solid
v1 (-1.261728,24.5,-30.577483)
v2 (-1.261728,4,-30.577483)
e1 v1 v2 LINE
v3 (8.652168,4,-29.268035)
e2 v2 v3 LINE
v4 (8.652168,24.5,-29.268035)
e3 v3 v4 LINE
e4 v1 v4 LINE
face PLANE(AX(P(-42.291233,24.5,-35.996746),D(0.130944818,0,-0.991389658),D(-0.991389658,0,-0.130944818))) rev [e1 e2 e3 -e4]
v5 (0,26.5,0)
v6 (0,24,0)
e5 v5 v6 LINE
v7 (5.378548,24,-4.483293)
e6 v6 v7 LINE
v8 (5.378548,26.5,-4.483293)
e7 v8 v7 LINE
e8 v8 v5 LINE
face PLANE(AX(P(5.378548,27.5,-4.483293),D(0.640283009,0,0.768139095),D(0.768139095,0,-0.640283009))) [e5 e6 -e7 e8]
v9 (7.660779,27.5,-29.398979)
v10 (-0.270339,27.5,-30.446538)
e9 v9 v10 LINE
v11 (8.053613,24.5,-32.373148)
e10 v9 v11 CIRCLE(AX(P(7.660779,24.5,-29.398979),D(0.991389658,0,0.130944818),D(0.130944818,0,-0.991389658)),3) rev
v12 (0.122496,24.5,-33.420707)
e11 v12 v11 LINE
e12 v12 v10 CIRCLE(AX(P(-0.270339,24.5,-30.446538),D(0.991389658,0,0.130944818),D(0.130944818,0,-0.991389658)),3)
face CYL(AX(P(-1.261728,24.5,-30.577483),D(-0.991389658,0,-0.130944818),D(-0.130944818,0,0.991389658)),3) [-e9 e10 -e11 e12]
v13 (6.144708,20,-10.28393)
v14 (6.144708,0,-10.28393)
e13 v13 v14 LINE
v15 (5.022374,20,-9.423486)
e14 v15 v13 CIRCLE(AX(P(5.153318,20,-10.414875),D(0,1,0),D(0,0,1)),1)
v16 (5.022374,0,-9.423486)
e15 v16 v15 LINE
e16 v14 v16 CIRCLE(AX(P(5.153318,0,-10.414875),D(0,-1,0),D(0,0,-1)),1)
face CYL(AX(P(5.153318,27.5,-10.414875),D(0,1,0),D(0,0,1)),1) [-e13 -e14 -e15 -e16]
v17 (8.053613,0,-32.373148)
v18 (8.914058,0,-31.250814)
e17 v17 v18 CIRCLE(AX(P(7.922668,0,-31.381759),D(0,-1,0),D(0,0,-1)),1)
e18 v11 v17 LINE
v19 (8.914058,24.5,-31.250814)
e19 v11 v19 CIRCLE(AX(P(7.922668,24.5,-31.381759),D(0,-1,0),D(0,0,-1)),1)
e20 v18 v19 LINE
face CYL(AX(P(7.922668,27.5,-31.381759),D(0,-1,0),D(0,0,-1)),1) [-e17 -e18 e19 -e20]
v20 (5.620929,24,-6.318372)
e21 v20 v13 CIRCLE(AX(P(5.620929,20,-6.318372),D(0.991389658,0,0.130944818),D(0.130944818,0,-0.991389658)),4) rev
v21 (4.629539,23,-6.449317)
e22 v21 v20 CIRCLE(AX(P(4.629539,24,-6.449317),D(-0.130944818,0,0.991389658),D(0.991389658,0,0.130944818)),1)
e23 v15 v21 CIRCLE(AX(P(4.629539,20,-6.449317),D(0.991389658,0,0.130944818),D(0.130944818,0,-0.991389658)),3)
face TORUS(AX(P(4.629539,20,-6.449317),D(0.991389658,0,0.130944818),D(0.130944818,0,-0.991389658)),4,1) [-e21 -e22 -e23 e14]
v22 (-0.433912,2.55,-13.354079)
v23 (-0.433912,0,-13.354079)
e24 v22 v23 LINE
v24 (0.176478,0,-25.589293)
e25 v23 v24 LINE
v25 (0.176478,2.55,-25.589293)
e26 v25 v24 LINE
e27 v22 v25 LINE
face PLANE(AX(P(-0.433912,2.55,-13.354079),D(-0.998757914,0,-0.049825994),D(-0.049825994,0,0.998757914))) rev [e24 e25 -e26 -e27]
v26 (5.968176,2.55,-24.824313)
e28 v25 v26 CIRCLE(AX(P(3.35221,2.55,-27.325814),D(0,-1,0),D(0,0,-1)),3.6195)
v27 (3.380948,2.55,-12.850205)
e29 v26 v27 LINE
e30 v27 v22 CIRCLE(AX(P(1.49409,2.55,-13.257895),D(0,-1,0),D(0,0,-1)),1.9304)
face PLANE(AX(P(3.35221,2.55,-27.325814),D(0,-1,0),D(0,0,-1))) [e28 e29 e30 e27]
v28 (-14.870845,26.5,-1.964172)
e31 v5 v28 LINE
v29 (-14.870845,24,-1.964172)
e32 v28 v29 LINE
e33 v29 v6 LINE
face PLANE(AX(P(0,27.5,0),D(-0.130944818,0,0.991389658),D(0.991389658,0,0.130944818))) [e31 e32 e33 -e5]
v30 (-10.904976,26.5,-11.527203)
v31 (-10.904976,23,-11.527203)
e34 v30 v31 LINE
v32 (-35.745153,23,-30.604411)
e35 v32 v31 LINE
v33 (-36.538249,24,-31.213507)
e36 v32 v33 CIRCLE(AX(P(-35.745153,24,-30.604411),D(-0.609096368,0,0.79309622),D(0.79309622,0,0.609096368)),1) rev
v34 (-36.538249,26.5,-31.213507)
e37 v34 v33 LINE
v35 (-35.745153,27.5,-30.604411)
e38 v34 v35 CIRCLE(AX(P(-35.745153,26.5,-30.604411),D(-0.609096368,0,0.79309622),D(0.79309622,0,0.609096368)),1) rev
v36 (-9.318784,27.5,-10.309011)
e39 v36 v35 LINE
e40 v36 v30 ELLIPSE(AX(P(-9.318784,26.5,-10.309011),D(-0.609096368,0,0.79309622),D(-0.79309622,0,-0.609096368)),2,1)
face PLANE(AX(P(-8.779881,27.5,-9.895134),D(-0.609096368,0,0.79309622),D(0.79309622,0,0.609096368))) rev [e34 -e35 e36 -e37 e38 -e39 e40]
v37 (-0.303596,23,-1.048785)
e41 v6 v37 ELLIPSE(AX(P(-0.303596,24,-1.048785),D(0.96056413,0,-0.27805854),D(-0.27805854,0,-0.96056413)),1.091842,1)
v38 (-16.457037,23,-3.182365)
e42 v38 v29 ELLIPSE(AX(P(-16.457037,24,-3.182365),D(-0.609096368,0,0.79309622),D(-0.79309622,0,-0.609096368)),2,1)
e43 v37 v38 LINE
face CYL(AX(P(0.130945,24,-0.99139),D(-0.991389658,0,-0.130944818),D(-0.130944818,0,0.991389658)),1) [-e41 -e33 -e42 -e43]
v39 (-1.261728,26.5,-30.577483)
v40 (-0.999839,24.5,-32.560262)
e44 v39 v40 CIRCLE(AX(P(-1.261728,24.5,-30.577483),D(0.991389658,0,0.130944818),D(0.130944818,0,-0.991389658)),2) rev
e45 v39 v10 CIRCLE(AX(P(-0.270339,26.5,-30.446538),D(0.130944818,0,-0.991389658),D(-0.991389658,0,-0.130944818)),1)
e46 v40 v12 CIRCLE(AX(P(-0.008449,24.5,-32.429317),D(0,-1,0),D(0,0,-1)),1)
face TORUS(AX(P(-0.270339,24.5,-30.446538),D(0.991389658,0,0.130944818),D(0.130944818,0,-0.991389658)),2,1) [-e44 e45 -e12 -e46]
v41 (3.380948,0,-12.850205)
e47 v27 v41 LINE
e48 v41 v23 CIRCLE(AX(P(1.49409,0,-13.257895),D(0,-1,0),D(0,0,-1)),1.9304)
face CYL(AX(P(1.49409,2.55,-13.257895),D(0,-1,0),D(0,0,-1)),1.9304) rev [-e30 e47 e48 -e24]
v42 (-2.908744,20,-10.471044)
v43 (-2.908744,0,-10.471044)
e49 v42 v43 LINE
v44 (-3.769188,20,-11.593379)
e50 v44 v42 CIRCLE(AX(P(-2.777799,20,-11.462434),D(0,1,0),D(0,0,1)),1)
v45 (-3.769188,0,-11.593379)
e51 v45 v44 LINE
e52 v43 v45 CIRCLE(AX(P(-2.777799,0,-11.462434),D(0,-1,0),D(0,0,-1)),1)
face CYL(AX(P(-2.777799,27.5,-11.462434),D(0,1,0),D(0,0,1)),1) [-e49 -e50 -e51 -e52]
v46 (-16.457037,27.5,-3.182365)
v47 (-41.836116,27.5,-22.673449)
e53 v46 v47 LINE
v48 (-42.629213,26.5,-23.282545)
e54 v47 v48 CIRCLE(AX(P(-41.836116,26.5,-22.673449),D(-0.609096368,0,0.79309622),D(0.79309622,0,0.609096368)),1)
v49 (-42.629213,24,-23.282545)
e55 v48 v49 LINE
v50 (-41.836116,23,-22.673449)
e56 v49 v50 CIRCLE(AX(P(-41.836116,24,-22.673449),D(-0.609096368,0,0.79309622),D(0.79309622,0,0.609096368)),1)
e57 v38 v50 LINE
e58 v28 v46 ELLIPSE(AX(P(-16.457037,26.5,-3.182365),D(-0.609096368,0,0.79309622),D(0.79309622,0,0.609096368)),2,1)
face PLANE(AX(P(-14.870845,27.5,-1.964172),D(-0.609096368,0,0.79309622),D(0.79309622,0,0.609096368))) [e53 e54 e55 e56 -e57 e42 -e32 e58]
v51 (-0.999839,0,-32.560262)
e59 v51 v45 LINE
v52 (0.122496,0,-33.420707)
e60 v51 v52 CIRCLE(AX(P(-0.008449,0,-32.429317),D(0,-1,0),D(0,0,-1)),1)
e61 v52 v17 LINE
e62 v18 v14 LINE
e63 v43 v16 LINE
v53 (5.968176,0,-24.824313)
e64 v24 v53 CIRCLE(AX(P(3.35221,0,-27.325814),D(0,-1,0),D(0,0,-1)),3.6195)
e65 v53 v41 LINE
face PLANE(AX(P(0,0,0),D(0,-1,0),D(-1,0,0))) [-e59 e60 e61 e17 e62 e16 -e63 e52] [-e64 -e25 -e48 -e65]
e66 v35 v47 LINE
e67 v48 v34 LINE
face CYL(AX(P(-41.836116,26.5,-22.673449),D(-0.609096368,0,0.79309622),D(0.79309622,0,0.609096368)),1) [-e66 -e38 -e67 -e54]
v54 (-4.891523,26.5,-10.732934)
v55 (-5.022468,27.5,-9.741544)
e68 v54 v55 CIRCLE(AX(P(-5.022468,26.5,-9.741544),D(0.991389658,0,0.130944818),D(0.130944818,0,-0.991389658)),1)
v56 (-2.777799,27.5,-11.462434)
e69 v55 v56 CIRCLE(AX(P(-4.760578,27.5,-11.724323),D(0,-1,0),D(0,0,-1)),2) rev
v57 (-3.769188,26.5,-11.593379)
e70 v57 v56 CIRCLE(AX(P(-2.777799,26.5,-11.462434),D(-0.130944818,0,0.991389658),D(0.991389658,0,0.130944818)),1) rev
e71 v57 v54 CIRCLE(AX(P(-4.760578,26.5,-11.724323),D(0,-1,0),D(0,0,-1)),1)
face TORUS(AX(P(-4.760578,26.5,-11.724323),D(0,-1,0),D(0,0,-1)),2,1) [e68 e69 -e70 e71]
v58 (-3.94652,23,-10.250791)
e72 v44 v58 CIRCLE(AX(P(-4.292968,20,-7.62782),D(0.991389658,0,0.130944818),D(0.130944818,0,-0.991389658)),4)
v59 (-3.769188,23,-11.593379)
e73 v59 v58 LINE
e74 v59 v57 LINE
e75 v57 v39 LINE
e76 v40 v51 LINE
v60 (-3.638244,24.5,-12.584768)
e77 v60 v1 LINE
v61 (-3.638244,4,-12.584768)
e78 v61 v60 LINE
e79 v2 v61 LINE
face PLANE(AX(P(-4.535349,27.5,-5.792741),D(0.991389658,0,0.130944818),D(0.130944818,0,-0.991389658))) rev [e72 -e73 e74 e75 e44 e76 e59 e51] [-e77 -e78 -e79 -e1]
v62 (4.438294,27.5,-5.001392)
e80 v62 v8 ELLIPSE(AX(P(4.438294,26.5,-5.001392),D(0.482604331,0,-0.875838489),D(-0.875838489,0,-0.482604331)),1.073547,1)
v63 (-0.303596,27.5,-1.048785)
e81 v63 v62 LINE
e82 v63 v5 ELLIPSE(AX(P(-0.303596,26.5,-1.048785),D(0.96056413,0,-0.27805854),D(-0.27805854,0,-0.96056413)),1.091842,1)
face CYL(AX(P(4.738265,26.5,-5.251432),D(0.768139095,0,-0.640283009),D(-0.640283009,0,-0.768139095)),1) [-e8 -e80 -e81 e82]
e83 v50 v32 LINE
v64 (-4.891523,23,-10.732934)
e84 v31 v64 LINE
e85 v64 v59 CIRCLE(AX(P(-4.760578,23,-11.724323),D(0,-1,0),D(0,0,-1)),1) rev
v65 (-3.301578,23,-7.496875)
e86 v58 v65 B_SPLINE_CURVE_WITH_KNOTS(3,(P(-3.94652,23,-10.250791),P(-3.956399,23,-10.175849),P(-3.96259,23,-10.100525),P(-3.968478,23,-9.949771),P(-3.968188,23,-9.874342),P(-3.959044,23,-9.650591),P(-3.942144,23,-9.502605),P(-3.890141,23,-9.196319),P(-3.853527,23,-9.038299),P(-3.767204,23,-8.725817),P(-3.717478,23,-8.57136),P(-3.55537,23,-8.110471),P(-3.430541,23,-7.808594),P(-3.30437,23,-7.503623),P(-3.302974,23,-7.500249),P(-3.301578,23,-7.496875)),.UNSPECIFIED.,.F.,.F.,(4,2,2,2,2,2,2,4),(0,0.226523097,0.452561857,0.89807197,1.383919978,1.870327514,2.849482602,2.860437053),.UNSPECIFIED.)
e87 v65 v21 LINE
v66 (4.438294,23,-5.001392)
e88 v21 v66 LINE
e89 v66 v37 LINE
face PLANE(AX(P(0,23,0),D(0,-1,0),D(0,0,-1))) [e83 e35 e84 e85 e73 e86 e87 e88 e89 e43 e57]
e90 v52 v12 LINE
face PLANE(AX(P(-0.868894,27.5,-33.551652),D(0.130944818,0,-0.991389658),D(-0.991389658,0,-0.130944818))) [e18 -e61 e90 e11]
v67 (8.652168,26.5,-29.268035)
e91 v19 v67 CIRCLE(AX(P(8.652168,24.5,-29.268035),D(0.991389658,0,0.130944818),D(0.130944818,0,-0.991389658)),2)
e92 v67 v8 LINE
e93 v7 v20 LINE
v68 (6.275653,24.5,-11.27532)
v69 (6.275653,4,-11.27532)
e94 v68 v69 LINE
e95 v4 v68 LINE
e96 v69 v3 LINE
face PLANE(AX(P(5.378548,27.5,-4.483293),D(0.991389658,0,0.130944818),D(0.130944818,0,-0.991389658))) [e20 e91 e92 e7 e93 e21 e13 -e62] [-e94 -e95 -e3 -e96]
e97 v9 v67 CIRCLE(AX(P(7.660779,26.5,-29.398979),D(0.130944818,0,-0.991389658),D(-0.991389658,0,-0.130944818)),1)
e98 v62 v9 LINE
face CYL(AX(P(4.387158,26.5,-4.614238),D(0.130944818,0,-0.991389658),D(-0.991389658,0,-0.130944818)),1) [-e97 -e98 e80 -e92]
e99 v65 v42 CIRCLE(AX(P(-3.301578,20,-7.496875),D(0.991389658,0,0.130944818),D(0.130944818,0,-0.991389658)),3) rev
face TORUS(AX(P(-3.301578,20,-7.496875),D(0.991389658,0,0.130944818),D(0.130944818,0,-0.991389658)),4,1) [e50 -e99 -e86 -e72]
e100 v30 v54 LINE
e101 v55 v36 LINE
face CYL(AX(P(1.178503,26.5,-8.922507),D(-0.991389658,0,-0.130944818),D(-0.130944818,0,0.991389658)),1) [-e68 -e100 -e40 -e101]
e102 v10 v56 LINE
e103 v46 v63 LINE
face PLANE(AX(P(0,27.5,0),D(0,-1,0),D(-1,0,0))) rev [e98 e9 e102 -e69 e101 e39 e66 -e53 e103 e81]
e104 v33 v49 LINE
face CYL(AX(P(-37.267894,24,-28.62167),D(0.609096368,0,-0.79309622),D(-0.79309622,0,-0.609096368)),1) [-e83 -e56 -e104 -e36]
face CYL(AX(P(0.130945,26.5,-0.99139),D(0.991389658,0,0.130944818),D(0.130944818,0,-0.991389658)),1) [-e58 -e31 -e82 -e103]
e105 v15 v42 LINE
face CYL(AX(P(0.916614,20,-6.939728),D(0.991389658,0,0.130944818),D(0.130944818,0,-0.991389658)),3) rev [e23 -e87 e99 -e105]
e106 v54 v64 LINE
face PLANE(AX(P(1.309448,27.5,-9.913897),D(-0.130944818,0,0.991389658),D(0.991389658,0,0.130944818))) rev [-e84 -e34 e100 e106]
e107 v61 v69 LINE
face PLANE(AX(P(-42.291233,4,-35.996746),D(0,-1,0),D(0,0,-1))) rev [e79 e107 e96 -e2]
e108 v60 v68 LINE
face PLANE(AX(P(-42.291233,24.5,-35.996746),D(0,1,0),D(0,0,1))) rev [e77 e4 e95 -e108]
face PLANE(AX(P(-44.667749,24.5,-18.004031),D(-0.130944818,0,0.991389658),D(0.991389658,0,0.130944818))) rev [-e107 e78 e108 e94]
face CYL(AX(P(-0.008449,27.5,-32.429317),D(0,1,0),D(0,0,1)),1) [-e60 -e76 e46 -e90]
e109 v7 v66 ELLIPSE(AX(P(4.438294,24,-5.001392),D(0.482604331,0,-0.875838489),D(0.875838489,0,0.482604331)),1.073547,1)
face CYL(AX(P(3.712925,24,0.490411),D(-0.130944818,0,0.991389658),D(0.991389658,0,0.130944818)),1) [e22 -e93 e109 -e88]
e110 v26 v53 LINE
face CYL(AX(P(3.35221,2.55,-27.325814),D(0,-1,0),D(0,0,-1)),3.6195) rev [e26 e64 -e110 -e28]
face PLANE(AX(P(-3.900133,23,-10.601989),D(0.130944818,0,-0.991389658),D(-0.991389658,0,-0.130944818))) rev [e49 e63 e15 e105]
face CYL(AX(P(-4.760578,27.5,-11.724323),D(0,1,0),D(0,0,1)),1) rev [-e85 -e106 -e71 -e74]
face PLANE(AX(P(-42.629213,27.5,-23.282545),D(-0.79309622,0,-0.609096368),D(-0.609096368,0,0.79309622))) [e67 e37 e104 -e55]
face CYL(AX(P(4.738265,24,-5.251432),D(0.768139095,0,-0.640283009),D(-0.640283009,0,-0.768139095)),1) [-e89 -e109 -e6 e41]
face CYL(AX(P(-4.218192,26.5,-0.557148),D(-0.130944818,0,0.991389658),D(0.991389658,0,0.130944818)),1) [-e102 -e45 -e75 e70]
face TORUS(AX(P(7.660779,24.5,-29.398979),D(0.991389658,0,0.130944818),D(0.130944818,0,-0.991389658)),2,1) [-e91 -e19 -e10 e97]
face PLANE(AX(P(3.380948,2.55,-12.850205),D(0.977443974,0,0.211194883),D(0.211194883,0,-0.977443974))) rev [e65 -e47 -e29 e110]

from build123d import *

# Parameters (mm, degrees)
EXTRUDE_THIN1_DEPTH = 27.5
CUT_EXTRUDE1_DEPTH  = 23
CUT_EXTRUDE2_DEPTH  = 2.55
FILLET1_R           = 3
FILLET2_R           = 1
CUT_EXTRUDE3_REACH  = 66.468
SKETCH5_W           = 18.148983488
SKETCH5_H           = 20.5


# Read off the part's stored shape, not the designer's step: Extrude-Thin1
with BuildPart() as part:
    # Extrude-Thin1 outline → Extrude-Thin1 (new body)
    with BuildSketch(Plane(origin=(0, 0, 0), x_dir=(1, 0, 0), z_dir=(0, 1, 0))):
        Polygon((-10.904976106, 11.527203276), (-36.538248885, 31.213507371), (-42.629212569, 23.282545173), (-14.870844874, 1.964172277), (0, 0), (5.378547824, 4.483293206), (9.045002742, 32.242203638), (-0.868893841, 33.551651823), (-3.900133282, 10.601988993), align=None)
    extrude(amount=EXTRUDE_THIN1_DEPTH)

    # Sketch2 → Cut-Extrude1 (cut)
    with BuildSketch(Plane.XZ):
        Polygon((-3.900133282, -10.601988993), (6.0137633, -9.292540808), (4.704315116, 0.621355774), (-14.870844874, -1.964172277), (-42.629212569, -23.282545173), (-36.538248885, -31.213507371), (-10.904976106, -11.527203276), align=None)
    extrude(amount=-CUT_EXTRUDE1_DEPTH, mode=Mode.SUBTRACT)

    # Sketch3 → Cut-Extrude2 (cut)
    with BuildSketch(Plane.XZ):
        with BuildLine():
            Line((3.380947821, -12.850204555), (5.968175927, -24.824313447))
            ThreePointArc((5.968175927, -24.824313447), (3.826164813, -30.914148414), (0.176477543, -25.589293076))
            Line((0.176477543, -25.589293076), (-0.433912303, -13.354079255))
            ThreePointArc((-0.433912303, -13.354079255), (1.241314096, -11.34411656), (3.380947821, -12.850204555))
        make_face()
    extrude(amount=-CUT_EXTRUDE2_DEPTH, mode=Mode.SUBTRACT)

    # Fillet1
    fillet1_edges = [part.edges().sort_by_distance(p)[0] for p in [
        (4.08805445, 27.5, -32.89692773),
        (1.056815009, 23, -9.947264901),
    ]]
    fillet(fillet1_edges, radius=FILLET1_R)

    # Fillet2
    fillet2_edges = [part.edges().sort_by_distance(p)[0] for p in [
        (-3.900133282, 25.25, -10.601988993),
        (-7.435422437, 27.5, -0.982086139),
        (2.689273912, 27.5, -2.241646603),
        (-3.900133282, 10, -10.601988993),
        (-39.583730727, 23, -27.248026272),
        (-7.435422437, 23, -0.982086139),
        (-7.402554694, 27.5, -11.064596135),
        (2.689273912, 23, -2.241646603),
        (-0.868893841, 12.25, -33.551651823),
        (9.045002742, 12.25, -32.242203638),
        (6.0137633, 10, -9.292540808),
        (7.015358055, 27.5, -16.875663935),
        (5.499738334, 23, -5.40083252),
        (8.929944194, 26.621320344, -31.371089714),
        (-2.580930789, 27.5, -20.589735921),
        (-0.983952389, 26.621320344, -32.680537899),
        (5.898704753, 22.121320344, -8.421426884),
        (-4.01519183, 22.121320344, -9.730875069),
        (-39.583730727, 27.5, -27.248026272),
    ]]
    fillet(fillet2_edges, radius=FILLET2_R)

    # Sketch5 → Cut-Extrude3 (cut, up to next)
    with BuildSketch(Plane(origin=(4.704315116, 0, 0.621355774), x_dir=(0.13094481849155867, 0, -0.9913896582626898), z_dir=(0.9913896582626898, 0, 0.13094481849155867)), mode=Mode.PRIVATE) as cut_extrude3_sk1:
        with Locations((21.074491744, 14.25)):
            Rectangle(SKETCH5_W, SKETCH5_H)
    cut_extrude3_tool1 = extrude(cut_extrude3_sk1.sketch, amount=-CUT_EXTRUDE3_REACH, mode=Mode.PRIVATE) & part.part
    add(cut_extrude3_tool1.solids().sort_by_distance((7.463911, 14.25, -20.271677))[0], mode=Mode.SUBTRACT)


solid = part.part
